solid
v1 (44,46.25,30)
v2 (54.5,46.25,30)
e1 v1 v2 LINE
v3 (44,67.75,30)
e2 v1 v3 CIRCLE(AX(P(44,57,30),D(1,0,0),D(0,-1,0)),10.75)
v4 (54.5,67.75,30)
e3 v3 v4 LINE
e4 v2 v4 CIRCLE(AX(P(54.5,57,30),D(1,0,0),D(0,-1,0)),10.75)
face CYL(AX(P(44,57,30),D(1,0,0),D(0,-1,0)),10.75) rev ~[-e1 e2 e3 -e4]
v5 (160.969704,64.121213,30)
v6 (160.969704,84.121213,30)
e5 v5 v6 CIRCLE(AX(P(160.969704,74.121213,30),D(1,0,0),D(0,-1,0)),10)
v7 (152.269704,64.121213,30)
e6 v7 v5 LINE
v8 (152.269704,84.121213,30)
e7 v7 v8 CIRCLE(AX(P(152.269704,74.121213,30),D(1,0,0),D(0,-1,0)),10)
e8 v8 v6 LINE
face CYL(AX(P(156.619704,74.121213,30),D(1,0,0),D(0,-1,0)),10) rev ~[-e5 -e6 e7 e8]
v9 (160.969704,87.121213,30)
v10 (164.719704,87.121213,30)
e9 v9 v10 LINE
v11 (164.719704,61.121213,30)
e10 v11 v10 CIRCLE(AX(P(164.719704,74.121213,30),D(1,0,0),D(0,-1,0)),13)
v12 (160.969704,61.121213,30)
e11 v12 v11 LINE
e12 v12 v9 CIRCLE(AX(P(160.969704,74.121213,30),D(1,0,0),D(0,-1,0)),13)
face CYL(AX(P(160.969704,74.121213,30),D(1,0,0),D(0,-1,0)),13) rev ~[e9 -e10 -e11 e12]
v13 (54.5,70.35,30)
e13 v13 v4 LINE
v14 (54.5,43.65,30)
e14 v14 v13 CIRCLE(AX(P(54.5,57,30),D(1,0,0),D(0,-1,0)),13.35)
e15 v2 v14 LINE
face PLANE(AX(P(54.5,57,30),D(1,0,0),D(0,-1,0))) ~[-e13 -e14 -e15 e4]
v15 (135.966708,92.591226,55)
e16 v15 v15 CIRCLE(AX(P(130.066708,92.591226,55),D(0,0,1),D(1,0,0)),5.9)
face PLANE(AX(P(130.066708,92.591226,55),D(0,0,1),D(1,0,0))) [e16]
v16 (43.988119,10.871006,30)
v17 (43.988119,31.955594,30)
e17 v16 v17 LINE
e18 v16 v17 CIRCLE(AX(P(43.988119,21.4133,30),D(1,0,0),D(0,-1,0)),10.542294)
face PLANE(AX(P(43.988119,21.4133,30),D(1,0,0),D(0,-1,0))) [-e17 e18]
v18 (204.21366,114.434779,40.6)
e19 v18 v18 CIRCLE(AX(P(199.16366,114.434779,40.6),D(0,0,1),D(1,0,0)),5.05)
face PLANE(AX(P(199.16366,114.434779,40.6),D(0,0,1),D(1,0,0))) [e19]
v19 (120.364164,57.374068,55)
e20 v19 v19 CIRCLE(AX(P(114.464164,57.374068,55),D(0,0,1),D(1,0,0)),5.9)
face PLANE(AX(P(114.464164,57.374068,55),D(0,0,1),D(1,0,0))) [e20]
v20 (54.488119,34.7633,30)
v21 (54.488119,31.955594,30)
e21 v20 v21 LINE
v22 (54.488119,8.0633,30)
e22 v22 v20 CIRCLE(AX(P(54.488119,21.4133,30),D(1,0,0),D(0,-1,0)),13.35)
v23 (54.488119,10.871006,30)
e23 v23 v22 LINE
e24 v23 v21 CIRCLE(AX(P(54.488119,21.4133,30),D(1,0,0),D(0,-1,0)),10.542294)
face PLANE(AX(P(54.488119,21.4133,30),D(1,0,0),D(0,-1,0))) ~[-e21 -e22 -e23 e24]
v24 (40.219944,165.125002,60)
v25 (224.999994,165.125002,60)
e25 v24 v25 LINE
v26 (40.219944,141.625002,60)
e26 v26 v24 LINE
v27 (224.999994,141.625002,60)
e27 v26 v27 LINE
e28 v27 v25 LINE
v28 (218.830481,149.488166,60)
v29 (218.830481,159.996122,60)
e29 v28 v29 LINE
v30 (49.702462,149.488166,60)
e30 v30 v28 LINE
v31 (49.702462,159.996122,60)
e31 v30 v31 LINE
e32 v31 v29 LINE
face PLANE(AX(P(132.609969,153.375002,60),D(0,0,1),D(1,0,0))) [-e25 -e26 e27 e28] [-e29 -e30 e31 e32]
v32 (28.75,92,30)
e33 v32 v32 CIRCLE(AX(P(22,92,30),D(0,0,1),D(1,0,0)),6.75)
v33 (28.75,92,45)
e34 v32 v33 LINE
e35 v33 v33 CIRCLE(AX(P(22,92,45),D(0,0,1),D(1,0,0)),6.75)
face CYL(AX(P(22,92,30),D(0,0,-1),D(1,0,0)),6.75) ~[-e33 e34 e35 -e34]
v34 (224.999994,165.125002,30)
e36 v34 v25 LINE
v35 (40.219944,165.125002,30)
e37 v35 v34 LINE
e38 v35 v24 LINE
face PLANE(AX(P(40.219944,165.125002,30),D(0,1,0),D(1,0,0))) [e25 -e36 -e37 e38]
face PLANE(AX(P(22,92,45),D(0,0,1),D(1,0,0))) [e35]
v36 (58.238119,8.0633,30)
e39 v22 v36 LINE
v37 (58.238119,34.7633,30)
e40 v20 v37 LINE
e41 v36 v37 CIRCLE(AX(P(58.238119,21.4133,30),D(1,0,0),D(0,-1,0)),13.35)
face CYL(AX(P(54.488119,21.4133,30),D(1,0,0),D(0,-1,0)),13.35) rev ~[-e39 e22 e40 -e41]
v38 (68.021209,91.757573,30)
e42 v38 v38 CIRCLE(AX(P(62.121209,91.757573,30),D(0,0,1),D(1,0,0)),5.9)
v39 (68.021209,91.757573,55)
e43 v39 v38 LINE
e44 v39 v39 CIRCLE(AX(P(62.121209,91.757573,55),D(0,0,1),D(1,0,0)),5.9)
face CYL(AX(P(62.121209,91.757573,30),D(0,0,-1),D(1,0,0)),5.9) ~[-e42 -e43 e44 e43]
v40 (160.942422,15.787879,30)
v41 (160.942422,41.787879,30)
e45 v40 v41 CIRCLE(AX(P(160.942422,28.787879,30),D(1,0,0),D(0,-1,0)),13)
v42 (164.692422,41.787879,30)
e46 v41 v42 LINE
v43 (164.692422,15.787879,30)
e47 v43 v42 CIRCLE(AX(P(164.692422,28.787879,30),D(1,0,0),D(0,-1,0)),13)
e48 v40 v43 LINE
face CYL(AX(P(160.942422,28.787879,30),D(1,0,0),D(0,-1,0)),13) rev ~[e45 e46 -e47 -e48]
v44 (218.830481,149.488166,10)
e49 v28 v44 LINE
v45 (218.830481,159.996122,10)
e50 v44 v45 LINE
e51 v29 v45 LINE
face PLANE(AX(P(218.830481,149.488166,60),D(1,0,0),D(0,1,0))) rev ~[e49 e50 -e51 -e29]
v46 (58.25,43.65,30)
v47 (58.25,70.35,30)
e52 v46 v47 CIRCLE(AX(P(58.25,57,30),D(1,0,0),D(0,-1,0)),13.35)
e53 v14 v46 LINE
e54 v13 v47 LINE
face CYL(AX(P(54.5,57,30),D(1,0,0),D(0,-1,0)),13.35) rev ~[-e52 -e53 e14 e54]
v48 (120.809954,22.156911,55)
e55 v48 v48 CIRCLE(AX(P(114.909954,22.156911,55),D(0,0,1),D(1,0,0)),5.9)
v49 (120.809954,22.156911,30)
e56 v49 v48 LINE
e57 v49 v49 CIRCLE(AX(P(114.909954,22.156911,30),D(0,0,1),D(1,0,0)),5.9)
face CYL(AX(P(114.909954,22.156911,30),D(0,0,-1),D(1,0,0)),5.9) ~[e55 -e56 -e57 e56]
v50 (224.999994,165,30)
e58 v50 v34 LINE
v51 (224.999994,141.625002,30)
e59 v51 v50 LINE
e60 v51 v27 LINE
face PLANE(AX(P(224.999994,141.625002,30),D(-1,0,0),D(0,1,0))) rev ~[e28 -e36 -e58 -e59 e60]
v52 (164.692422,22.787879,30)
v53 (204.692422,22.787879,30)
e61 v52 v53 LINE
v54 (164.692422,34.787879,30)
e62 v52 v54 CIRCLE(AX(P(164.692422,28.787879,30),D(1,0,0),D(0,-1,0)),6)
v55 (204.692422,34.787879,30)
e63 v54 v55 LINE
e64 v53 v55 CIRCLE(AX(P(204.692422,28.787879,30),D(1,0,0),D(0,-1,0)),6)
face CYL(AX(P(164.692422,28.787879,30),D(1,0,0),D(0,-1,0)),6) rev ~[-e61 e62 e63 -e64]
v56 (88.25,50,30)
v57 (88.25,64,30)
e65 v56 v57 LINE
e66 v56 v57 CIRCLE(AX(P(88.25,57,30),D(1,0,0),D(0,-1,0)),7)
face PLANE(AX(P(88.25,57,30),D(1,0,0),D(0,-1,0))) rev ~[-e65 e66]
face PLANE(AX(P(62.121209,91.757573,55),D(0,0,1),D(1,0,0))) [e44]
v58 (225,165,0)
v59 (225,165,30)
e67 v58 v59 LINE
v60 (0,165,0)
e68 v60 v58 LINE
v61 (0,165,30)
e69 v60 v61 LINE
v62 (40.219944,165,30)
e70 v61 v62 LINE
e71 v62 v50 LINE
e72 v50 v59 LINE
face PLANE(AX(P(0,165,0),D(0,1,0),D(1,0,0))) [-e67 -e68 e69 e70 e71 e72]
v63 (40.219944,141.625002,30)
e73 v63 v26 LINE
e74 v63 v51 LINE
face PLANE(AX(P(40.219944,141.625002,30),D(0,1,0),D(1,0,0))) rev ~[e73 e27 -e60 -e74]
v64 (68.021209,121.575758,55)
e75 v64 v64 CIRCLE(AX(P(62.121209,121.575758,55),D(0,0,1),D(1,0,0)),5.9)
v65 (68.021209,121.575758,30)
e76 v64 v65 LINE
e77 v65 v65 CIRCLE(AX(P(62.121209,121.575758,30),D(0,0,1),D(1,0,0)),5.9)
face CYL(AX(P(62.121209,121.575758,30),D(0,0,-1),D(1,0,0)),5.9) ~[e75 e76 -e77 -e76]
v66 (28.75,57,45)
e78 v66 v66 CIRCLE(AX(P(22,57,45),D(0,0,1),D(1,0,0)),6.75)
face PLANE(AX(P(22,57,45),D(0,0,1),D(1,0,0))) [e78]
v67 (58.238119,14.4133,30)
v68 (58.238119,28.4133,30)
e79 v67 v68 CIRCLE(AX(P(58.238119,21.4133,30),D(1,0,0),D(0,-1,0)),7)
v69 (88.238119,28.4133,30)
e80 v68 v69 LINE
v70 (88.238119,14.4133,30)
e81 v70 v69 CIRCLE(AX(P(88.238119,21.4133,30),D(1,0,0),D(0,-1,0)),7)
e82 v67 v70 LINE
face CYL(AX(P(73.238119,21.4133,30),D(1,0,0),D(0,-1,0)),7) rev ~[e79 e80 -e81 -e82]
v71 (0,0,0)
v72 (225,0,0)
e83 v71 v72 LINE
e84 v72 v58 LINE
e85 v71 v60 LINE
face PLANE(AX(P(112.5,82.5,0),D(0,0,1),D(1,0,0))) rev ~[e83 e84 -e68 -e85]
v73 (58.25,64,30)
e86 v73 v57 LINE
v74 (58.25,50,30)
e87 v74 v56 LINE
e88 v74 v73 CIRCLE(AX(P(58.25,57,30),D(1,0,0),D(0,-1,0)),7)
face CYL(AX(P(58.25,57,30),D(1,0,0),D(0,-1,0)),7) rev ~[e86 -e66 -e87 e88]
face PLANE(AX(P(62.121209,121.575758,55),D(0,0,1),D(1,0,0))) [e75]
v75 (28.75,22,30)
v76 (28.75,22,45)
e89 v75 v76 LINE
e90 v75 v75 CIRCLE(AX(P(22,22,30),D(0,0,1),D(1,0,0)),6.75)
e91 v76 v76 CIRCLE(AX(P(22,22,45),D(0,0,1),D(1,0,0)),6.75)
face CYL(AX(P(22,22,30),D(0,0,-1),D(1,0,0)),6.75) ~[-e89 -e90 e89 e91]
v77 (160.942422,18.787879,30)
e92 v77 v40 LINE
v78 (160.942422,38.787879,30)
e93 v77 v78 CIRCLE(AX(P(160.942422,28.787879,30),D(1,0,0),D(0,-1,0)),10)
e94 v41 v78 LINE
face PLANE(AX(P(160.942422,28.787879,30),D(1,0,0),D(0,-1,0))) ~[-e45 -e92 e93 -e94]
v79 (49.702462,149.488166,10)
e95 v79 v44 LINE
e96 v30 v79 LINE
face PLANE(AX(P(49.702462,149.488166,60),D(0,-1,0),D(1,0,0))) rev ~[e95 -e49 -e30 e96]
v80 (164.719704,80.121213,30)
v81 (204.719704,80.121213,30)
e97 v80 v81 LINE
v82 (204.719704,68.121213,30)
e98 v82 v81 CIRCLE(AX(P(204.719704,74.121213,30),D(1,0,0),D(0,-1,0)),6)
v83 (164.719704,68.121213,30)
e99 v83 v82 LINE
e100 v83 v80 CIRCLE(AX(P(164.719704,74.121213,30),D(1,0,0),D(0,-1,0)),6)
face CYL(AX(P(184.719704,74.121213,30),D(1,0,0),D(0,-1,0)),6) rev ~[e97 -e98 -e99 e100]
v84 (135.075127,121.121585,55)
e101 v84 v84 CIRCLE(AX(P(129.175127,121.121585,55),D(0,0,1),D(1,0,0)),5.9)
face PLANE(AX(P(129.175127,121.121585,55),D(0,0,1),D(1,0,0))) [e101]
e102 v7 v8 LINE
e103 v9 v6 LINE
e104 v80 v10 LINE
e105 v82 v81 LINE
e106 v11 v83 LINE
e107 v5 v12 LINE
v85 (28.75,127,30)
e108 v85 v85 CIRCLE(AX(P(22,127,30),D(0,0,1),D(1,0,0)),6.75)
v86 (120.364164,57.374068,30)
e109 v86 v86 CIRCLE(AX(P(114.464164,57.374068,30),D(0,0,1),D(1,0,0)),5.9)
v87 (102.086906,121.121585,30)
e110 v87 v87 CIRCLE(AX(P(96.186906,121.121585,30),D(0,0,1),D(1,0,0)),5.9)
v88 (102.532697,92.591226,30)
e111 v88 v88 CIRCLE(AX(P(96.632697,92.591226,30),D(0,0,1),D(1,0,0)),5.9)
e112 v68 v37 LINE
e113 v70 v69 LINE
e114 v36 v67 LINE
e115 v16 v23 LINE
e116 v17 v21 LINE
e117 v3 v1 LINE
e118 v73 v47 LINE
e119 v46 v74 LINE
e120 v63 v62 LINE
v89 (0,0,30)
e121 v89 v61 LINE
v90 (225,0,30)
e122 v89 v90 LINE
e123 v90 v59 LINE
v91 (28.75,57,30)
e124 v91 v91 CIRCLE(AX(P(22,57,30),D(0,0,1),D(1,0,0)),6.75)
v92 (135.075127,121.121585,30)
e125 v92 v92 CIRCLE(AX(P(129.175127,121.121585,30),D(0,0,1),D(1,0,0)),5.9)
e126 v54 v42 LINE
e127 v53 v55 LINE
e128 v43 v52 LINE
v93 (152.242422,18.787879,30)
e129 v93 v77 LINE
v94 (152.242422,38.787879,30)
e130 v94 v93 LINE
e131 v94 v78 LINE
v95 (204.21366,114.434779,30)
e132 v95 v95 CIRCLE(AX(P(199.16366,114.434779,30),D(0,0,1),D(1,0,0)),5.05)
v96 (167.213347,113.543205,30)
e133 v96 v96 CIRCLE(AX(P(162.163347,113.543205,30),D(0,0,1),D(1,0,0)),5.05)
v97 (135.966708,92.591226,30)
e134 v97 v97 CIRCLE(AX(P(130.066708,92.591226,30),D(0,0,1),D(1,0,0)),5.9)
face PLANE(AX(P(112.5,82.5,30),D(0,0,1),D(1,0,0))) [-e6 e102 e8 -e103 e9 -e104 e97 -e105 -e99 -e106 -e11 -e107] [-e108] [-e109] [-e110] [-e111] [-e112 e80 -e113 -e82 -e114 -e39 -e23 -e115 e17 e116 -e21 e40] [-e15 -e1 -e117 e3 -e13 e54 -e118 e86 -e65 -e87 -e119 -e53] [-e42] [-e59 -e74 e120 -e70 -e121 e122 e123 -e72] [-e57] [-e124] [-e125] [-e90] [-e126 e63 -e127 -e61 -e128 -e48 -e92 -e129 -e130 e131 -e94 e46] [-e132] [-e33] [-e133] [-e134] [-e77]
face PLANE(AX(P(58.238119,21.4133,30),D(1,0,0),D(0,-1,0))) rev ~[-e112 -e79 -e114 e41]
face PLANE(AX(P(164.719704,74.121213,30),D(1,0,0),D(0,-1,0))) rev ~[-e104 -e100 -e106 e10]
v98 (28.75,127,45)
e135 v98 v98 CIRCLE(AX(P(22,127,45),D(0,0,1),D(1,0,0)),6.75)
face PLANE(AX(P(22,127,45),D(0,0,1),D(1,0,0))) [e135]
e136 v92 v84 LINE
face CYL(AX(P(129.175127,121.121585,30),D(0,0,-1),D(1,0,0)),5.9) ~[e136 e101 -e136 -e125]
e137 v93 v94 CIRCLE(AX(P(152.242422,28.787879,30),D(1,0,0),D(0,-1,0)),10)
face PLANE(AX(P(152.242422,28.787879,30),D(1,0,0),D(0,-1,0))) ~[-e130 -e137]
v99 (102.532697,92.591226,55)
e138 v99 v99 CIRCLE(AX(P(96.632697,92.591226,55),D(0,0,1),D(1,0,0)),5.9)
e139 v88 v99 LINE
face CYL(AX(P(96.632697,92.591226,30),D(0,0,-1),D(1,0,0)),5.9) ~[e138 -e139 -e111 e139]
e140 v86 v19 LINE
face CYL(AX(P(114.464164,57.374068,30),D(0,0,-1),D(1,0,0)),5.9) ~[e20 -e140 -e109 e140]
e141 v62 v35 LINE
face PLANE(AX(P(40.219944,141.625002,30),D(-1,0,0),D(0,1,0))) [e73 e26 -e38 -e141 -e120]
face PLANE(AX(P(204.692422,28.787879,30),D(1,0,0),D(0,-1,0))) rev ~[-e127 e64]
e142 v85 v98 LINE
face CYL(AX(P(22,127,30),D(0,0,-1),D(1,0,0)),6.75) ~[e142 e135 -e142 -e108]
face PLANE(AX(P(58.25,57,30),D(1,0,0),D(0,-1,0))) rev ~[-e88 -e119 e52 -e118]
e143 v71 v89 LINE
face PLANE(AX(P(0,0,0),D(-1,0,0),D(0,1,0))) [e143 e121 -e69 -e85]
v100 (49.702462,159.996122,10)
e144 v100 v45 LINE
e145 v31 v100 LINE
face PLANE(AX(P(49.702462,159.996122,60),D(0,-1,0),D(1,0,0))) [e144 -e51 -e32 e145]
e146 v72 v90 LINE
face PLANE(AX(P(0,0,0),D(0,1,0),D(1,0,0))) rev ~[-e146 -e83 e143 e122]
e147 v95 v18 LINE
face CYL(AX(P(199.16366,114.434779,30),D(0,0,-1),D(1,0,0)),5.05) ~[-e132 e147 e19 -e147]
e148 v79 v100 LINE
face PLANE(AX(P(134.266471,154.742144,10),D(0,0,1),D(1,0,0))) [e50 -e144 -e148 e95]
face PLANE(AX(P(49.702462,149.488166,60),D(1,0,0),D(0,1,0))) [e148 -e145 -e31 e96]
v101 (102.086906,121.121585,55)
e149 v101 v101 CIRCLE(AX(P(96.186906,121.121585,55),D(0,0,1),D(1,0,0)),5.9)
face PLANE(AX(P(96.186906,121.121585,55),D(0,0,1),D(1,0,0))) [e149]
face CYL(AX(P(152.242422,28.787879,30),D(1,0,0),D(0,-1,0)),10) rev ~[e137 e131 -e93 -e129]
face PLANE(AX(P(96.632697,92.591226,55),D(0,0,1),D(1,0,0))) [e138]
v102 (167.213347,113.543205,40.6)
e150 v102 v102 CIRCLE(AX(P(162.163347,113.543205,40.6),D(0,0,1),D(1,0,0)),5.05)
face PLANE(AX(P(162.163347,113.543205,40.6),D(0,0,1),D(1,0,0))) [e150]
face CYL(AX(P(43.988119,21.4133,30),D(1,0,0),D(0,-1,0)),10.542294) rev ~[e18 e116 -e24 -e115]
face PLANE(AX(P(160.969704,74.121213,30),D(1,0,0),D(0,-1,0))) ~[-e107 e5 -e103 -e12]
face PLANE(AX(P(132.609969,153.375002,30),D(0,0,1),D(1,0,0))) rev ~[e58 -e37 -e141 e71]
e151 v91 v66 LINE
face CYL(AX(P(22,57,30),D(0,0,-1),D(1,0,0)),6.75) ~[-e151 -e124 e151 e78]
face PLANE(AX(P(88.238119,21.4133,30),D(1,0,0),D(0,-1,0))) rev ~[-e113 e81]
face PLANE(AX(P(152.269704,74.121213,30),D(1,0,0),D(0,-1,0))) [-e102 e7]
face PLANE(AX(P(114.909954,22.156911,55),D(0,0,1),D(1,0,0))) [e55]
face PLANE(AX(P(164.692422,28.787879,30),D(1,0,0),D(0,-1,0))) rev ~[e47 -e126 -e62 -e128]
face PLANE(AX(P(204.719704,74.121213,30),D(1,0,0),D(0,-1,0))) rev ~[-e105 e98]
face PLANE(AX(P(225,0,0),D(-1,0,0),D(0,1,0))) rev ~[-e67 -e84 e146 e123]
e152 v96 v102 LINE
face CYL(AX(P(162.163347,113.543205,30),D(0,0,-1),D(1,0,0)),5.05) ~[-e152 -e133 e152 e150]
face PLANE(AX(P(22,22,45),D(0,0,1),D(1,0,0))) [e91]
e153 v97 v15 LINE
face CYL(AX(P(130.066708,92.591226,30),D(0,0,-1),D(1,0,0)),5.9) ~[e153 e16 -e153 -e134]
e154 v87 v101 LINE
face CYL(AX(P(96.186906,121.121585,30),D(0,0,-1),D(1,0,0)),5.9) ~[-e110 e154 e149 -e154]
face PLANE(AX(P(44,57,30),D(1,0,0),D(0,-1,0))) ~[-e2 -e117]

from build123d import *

# Parameters (mm, degrees)
F0_W      = 225
F0_H      = 165
F1_DEPTH  = 30
F2_R      = 6.75
F3_DEPTH  = 15
F5_W      = 0.0118811131
F5_H      = 10.5422940105
F5_W_2    = 10.4881188869
F5_W_3    = 30
F5_H_2    = 7
F10_R     = 5.9
F11_DEPTH = 12.85
F12_DEPTH = 25
F15_W     = 8.7
F15_H     = 10
F15_W_2   = 40
F15_H_2   = 6
F17_R     = 5.05
F18_DEPTH = 10.6
F19_W     = 184.7800500691
F19_H     = 23.5
F20_DEPTH = 30
F21_W     = 169.1280193627
F21_H     = 10.5079561472
F22_DEPTH = 50


# Not quite as in the source:
# - a feature names something its author has since deleted; it is built from what else it names


with BuildPart() as f1:
    # F0 (on Top) → F1 (new body)
    with BuildSketch(Plane.XY):
        with Locations((112.5, 82.5)):
            Rectangle(F0_W, F0_H)
    extrude(amount=F1_DEPTH)

    # F2 (on face) → F3 (join)
    with BuildSketch(Plane.XY.offset(30)):
        with Locations((22, 127)):
            Circle(F2_R)
        with Locations((22, 92)):
            Circle(F2_R)
        with Locations((22, 57)):
            Circle(F2_R)
        with Locations((22, 22)):
            Circle(F2_R)
    extrude(amount=F3_DEPTH)

    # F5 (on face) → F6 (revolve, cut)
    with BuildSketch(Plane.XY.offset(30)):
        with Locations((43.9940594435, 16.1421531811)):
            Rectangle(F5_W, F5_H)
        with Locations((49.2440594435, 16.1421531811)):
            Rectangle(F5_W_2, F5_H)
        Polygon((58.2381188869, 21.4133001864), (54.4881188869, 21.4133001864), (54.4881188869, 10.8710061759), (54.4881188869, 8.0633001864), (58.2381188869, 8.0633001864), (58.2381188869, 14.4133001864), align=None)
        with Locations((73.2381188869, 17.9133001864)):
            Rectangle(F5_W_3, F5_H_2)
    revolve(axis=Axis((49.2381188869, 21.4133001864, 30), (1, 0, 0)), mode=Mode.SUBTRACT)

    # F7 (on face) → F8 (revolve, cut)
    with BuildSketch(Plane.XY.offset(30)):
        Polygon((44, 57), (44, 46.25), (54.5, 46.25), (54.5, 43.65), (58.25, 43.65), (58.25, 50), (88.25, 50), (88.25, 57), (58.25, 57), (54.5, 57), align=None)
    revolve(axis=Axis((49.25, 57, 30), (1, 0, 0)), mode=Mode.SUBTRACT)

    # F10 (on face) → F11 (join)
    with BuildSketch(Plane.XY.offset(30)):
        with Locations((62.1212087572, 121.5757578611)):
            Circle(F10_R)
        with Locations((62.1212087572, 91.7575731874)):
            Circle(F10_R)
    extrude(amount=F11_DEPTH)

    # F10 (on face) → F12 (join)
    with BuildSketch(Plane.XY.offset(30)):
        with Locations((62.1212087572, 121.5757578611)):
            Circle(F10_R)
        with Locations((62.1212087572, 91.7575731874)):
            Circle(F10_R)
        with Locations((96.6326966882, 92.5912261009)):
            Circle(F10_R)
        with Locations((96.1869060993, 121.1215853691)):
            Circle(F10_R)
        with Locations((114.9099543691, 22.1569109708)):
            Circle(F10_R)
        with Locations((129.1751265526, 121.1215853691)):
            Circle(F10_R)
        with Locations((130.0667077303, 92.5912261009)):
            Circle(F10_R)
        with Locations((114.4641637802, 57.3740676045)):
            Circle(F10_R)
    extrude(amount=F12_DEPTH)

    # F13 (on face) → F14 (revolve, cut)
    with BuildSketch(Plane.XY.offset(30)):
        Polygon((160.9424221039, 28.7878794968), (152.2424221039, 28.7878794968), (152.2424221039, 18.7878794968), (160.9424221039, 18.7878794968), (160.9424221039, 15.7878794968), (164.6924221039, 15.7878794968), (164.6924221039, 22.7878794968), (204.6924221039, 22.7878794968), (204.6924221039, 28.7878794968), (164.6924221039, 28.7878794968), align=None)
    revolve(axis=Axis((184.6924221039, 28.7878794968, 30), (1, 0, 0)), mode=Mode.SUBTRACT)

    # F15 (on face) → F16 (revolve, cut)
    with BuildSketch(Plane.XY.offset(30)):
        with Locations((156.6197043896, 69.1212128103)):
            Rectangle(F15_W, F15_H)
        Polygon((164.7197043896, 74.1212128103), (160.9697043896, 74.1212128103), (160.9697043896, 64.1212128103), (160.9697043896, 61.1212128103), (164.7197043896, 61.1212128103), (164.7197043896, 68.1212128103), align=None)
        with Locations((184.7197043896, 71.1212128103)):
            Rectangle(F15_W_2, F15_H_2)
    revolve(axis=Axis((184.7197043896, 74.1212128103, 30), (1, 0, 0)), mode=Mode.SUBTRACT)

    # F17 (on face) → F18 (join)
    with BuildSketch(Plane.XY.offset(30)):
        with Locations((162.1633470058, 113.5432049632)):
            Circle(F17_R)
        with Locations((199.1636604071, 114.4347786903)):
            Circle(F17_R)
    extrude(amount=F18_DEPTH)

    # F19 (on face) → F20 (join)
    with BuildSketch(Plane.XY.offset(30)):
        with Locations((132.609969005, 153.3750020266)):
            Rectangle(F19_W, F19_H)
    extrude(amount=F20_DEPTH)

    # F21 (on face) → F22 (cut)
    with BuildSketch(Plane.XY.offset(60)):
        with Locations((134.2664714903, 154.7421440482)):
            Rectangle(F21_W, F21_H)
    extrude(amount=-F22_DEPTH, mode=Mode.SUBTRACT)


solid = f1.part
